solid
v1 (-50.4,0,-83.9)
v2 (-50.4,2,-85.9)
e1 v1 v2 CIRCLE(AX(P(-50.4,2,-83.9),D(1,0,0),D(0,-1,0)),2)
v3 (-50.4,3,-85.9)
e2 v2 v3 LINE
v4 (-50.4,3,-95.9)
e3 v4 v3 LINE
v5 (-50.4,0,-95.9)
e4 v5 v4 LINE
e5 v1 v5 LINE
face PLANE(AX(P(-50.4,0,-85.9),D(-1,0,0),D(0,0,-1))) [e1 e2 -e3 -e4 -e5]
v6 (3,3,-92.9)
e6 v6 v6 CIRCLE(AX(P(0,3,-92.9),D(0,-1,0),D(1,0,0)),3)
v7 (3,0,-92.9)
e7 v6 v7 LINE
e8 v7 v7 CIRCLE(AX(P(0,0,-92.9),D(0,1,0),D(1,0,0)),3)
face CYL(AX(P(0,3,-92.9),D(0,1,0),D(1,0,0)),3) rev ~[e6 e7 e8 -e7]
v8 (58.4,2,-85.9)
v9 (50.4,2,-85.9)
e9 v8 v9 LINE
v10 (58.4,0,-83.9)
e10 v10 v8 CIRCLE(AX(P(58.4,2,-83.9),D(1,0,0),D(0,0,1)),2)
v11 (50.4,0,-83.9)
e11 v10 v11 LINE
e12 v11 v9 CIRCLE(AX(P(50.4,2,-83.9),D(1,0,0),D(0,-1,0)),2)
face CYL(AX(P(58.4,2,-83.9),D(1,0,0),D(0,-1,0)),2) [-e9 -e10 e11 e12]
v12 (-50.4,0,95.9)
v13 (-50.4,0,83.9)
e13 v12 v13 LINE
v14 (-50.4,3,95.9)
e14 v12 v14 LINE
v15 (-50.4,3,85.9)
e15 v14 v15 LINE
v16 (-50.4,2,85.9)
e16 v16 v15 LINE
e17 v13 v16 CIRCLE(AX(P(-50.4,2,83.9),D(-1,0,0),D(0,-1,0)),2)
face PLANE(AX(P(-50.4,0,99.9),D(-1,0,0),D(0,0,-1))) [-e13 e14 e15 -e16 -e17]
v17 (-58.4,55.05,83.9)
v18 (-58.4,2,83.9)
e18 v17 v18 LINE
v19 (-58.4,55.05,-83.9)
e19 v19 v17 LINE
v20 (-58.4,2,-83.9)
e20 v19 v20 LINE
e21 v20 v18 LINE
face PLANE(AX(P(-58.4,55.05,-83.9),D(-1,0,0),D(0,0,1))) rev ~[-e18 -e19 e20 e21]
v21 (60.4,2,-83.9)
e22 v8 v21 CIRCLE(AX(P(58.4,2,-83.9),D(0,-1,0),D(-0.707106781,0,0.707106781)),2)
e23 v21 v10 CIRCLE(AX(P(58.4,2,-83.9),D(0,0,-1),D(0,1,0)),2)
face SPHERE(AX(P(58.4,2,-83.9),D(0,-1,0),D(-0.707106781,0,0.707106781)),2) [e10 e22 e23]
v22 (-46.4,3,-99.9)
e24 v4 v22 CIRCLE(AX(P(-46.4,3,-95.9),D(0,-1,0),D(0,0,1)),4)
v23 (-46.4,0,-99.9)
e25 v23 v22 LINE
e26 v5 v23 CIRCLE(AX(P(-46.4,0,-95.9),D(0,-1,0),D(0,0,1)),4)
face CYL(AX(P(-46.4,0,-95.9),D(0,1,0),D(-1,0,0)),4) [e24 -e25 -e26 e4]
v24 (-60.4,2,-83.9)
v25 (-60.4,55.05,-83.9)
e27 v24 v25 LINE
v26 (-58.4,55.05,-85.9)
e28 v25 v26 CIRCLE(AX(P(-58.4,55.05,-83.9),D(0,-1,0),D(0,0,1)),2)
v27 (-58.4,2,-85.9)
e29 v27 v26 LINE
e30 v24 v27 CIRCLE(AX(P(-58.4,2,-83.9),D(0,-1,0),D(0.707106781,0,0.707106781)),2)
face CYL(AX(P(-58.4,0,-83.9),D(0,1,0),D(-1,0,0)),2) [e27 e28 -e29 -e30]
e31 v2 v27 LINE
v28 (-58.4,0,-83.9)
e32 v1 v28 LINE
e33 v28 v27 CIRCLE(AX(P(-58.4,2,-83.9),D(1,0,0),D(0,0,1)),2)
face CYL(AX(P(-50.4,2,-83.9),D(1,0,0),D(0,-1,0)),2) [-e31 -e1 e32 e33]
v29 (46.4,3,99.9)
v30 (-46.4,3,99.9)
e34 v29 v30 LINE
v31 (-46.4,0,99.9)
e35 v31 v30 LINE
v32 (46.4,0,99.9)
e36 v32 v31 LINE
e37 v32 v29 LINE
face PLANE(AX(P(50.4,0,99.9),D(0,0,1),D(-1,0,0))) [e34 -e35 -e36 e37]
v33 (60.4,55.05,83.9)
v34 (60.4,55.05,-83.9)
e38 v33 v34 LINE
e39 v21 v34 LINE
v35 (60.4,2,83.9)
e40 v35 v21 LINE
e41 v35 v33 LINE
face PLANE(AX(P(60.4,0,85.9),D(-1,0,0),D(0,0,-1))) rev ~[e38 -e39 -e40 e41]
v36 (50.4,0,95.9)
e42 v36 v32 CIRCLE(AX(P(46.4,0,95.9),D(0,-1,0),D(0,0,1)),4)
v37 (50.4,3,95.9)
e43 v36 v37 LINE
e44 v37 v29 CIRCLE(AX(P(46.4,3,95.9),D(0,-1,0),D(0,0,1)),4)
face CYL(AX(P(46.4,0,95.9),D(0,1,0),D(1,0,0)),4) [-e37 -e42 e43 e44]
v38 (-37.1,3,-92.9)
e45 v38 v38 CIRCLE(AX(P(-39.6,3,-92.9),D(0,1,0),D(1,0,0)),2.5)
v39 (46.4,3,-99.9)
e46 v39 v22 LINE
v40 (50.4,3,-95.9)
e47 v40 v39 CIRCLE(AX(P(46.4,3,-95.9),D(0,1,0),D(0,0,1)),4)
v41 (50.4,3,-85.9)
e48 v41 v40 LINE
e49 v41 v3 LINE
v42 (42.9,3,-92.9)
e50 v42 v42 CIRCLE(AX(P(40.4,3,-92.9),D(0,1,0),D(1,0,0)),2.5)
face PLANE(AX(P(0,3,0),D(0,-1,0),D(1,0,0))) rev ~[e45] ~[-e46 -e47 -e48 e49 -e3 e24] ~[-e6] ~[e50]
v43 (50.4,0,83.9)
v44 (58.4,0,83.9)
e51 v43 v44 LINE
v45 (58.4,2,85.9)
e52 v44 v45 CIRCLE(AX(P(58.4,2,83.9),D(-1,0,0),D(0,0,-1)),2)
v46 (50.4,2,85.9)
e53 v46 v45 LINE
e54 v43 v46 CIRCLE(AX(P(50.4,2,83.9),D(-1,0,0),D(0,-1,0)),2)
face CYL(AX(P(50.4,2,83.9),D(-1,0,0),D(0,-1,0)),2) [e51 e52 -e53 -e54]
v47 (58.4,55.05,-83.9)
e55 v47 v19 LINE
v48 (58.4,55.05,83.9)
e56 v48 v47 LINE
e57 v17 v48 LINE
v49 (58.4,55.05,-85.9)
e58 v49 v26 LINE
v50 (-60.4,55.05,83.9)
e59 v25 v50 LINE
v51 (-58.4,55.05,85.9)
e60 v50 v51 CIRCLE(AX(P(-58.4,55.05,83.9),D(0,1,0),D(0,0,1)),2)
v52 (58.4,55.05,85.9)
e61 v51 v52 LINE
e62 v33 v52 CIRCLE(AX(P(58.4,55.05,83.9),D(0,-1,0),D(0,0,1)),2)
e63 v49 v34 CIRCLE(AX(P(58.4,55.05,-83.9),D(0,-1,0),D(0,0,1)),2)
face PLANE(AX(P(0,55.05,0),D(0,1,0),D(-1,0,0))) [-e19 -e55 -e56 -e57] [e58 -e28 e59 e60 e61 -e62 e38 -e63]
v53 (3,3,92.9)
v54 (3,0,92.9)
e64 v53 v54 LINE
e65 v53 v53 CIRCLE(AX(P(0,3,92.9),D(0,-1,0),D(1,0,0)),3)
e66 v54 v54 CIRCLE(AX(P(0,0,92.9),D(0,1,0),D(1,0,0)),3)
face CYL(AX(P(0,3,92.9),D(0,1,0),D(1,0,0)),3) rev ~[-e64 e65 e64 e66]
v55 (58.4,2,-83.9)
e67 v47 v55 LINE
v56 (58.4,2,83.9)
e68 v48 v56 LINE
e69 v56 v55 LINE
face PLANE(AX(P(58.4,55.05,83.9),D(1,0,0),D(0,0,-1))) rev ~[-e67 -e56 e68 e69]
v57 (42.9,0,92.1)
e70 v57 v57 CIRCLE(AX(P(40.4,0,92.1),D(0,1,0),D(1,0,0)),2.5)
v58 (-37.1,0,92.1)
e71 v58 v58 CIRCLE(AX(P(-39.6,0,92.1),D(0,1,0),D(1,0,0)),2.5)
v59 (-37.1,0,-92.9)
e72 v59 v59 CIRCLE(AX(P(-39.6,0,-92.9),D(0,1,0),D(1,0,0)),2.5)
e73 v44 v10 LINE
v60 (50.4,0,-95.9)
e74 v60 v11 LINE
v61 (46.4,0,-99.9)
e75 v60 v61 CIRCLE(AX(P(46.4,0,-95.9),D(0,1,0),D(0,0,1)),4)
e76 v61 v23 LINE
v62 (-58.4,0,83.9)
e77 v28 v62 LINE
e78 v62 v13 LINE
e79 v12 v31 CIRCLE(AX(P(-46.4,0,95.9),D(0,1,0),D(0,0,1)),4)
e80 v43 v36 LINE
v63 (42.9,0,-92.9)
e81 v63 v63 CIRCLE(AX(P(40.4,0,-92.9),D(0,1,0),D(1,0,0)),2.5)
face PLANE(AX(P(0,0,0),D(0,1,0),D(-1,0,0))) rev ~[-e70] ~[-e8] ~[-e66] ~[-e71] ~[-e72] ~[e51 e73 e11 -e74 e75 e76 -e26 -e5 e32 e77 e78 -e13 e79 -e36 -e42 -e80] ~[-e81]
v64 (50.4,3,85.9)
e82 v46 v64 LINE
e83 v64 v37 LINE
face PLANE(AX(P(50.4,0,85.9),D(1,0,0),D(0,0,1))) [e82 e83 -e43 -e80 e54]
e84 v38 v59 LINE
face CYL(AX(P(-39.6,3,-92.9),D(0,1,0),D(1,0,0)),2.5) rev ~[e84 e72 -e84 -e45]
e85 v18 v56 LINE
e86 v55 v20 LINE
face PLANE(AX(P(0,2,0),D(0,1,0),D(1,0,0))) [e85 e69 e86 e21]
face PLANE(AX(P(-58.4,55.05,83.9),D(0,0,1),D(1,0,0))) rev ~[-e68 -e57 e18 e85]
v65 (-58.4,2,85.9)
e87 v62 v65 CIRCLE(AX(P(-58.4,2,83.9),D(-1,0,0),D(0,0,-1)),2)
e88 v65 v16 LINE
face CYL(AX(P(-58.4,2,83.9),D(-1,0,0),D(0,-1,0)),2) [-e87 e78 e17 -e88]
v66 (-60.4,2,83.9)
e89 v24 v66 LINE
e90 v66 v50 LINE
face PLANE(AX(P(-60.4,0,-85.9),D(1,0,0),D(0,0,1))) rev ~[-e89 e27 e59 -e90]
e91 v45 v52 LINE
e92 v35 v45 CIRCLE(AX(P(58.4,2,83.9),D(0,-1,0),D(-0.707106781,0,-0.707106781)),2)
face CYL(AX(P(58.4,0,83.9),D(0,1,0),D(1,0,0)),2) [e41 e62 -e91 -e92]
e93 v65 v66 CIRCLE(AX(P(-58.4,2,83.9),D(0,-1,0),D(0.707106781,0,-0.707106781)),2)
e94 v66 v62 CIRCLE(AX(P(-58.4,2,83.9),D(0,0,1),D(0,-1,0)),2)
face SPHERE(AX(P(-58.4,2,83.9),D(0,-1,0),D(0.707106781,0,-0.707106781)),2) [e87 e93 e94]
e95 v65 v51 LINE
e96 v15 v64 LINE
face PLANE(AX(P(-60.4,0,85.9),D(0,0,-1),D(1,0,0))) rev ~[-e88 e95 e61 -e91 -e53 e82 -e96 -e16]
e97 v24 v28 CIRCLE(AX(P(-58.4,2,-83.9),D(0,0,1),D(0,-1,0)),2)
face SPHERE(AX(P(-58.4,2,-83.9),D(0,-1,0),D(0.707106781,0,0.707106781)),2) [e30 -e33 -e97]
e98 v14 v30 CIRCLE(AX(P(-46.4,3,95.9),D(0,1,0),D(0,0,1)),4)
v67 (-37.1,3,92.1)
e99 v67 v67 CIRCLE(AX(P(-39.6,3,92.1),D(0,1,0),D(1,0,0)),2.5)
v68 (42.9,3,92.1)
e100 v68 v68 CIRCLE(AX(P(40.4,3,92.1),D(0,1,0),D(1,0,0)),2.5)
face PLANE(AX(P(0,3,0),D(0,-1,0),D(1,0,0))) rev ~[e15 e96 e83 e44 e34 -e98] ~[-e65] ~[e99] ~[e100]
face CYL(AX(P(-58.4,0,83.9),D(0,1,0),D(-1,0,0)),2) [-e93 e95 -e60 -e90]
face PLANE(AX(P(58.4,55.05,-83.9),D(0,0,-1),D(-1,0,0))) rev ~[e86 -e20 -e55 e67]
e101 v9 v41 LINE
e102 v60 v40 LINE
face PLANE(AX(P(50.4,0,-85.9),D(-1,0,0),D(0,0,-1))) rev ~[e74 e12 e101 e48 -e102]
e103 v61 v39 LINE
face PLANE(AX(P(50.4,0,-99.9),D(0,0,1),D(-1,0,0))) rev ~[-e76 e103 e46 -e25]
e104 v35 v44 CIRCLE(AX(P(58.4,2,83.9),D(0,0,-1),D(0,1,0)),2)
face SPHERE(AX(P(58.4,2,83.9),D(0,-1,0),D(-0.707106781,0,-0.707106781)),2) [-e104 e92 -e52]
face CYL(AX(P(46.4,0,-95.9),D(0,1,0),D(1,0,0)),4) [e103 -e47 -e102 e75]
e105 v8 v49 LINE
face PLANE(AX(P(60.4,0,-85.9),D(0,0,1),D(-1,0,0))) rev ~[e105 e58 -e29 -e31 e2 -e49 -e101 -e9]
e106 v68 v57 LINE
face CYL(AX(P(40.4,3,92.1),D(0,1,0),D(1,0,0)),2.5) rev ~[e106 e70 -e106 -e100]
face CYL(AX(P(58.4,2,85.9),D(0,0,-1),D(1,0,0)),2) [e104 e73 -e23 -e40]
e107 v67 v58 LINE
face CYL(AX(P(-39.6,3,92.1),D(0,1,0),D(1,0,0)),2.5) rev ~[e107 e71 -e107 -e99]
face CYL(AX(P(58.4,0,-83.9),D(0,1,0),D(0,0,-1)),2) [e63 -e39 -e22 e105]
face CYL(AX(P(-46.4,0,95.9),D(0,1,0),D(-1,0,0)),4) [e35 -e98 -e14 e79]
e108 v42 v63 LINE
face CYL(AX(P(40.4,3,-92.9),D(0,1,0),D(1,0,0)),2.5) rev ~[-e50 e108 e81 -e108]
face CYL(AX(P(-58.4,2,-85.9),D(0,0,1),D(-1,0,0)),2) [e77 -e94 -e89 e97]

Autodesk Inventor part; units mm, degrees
ref_plane "XZ Plane" through (0, 0, 0) normal (0, 1, 0) x (-1, 0, 0)
sketch "Sketch1" plane through (0, 0, 0) normal (0, 1, 0) x (-1, 0, 0)
  line L0 (60.4, 85.9) -> (-60.4, 85.9)
  line L1 (-60.4, 85.9) -> (-60.4, -85.9)
  line L2 (-60.4, -85.9) -> (60.4, -85.9)
  line L3 (60.4, -85.9) -> (60.4, 85.9)
  point P0 (0, 0)
  dimension "d0" = 85.9
  dimension "d1" = 85.9
  dimension "d2" = 60.4
  dimension "d3" = 60.4
extrude "Extrusion1" add sketch "Sketch1" along normal blind 55.05
fillet "Fillet1" radius 2 6 edges at (60.4, 27.525, 85.9) (-60.4, 27.525, 85.9) (60.4, 27.525, -85.9) (-60.4, 27.525, -85.9) (60.4, 0, 0) (-60.4, 0, 0)
sketch "Sketch2" plane through (0, 55.05, 0) normal (0, 1, 0) x (1, 0, 0)
  line L0 (-58.4, -83.9) -> (58.4, -83.9)
  line L1 (58.4, -83.9) -> (58.4, 83.9)
  line L2 (58.4, 83.9) -> (-58.4, 83.9)
  line L3 (-58.4, 83.9) -> (-58.4, -83.9)
  line L4 (-60.4, 83.9) -> (-60.4, -83.9) projected
  line L5 (-58.4, -85.9) -> (58.4, -85.9) projected
  line L6 (60.4, -83.9) -> (60.4, 83.9) projected
  line L7 (58.4, 85.9) -> (-58.4, 85.9) projected
  point P0 (0, 0)
  dimension "d7" = 2
  dimension "d8" = 2
  dimension "d9" = 2
  dimension "d10" = 2
extrude "Extrusion2" cut sketch "Sketch2" against normal blind 53.05
sketch "Sketch3" plane through (0, 0, 0) normal (0, -1, 0) x (1, 0, 0)
  line L0 (-58.4, -85.9) -> (-58.4, 85.9) projected
  line L1 (58.4, -85.9) -> (-58.4, -85.9) projected
  line L2 (58.4, 85.9) -> (58.4, -85.9) projected
  line L3 (-58.4, 85.9) -> (58.4, 85.9) projected
  line L4 (-58.4, 85.9) -> (58.4, 85.9) projected
  line L5 (50.4, 85.9) -> (50.4, 99.9)
  line L6 (50.4, 99.9) -> (-50.4, 99.9)
  line L7 (-50.4, 99.9) -> (-50.4, 85.9)
  line L8 (-60.4, 83.9) -> (-60.4, -83.9) projected
  line L9 (60.4, -83.9) -> (60.4, 83.9) projected
  line L10 (-134.6994, 0) -> (135.5184, 0) construction
  line L11 (50.4, -85.9) -> (50.4, -99.9)
  line L12 (50.4, -99.9) -> (-50.4, -99.9)
  line L13 (-50.4, -99.9) -> (-50.4, -85.9)
  line L14 (50.4, 85.9) -> (-50.4, 85.9)
  line L15 (-50.4, -85.9) -> (50.4, -85.9)
  point P0 (0, 0)
  dimension "d13" = 10
  dimension "d14" = 10
  dimension "d15" = 14
  dimension "d16" = 0
extrude "Extrusion3" add sketch "Sketch3" against normal blind 3 contours L1 L11 L12 L13 | L7 L6 L5 L3
fillet "Fillet2" radius 4 4 edges at (-50.4, 1.5, -99.9) (50.4, 1.5, -99.9) (50.4, 1.5, 99.9) (-50.4, 1.5, 99.9)
fillet "Fillet3" radius 2 8 edges at (-59.8142, 0.5858, 85.3142) (-54.4, 0, 85.9) (59.8142, 0.5858, 85.3142) (54.4, 0, 85.9) (59.8142, 0.5858, -85.3142) (54.4, 0, -85.9) (-59.8142, 0.5858, -85.3142) (-54.4, 0, -85.9)
sketch "Sketch4" plane through (0, 2, 0) normal (0, 1, 0) x (1, 0, 0)
  circle A0 centre (-54.9, 80.4) radius 1.25
  line L0 (58.4, 85.9) -> (-58.4, 85.9) projected
  line L1 (-60.4, 83.9) -> (-60.4, -83.9) projected
  circle A1 centre (54.1, 80.4) radius 1.25
  circle A2 centre (-54.9, -79.6) radius 1.25
  circle A3 centre (54.1, -79.6) radius 1.25
  circle A4 centre (-54.9, 80.4) radius 2.25
  circle A5 centre (-54.9, -79.6) radius 2.25
  circle A6 centre (54.1, 80.4) radius 2.25
  circle A7 centre (54.1, -79.6) radius 2.25
  line L2 (-58.4, 83.9) -> (-60.4, 83.9) projected
  line L3 (-58.4, 83.9) -> (-58.4, 75.9)
  line L4 (-58.4, 83.9) -> (-58.4, -83.9) projected
  line L5 (-58.4, 85.9) -> (-58.4, 83.9) projected
  line L6 (-58.4, 83.9) -> (-50.4, 83.9)
  line L7 (-58.4, 83.9) -> (58.4, 83.9) projected
  arc A8 (-55.4407, 78.2159) -> (-58.4, 75.9) centre (-56.0141, 75.9) ccw
  arc A9 (-50.4, 83.9) -> (-52.7159, 80.9407) centre (-50.4, 81.5141) ccw
  line L8 (58.4, 83.9) -> (58.4, -83.9) projected
  line L9 (58.4, 83.9) -> (48.8739, 83.9)
  line L10 (58.4, 83.9) -> (58.4, 75.9)
  line L11 (58.4, -83.9) -> (58.4, 83.9) projected
  line L12 (58.4, -83.9) -> (-58.4, -83.9) projected
  line L13 (-58.4, -83.9) -> (-58.4, -75.9)
  line L14 (-58.4, -83.9) -> (-58.4, 83.9) projected
  line L15 (-58.4, -83.9) -> (-50.4, -83.9)
  arc A10 (-52.7997, -80.4071) -> (-50.4, -83.9) centre (-50.4, -81.3292) ccw
  arc A11 (-58.4, -75.9) -> (-55.8323, -77.5522) centre (-56.5846, -75.9) ccw
  line L16 (58.4, -83.9) -> (50.4, -83.9)
  line L17 (58.4, -83.9) -> (58.4, -75.9)
  arc A12 (55.2614, -77.6729) -> (58.4, -75.9) centre (56.33, -75.9) ccw
  arc A13 (50.4, -83.9) -> (52.1729, -80.7614) centre (50.4, -81.83) ccw
  circle A14 centre (54.5, 0) radius 1.25
  circle A15 centre (-54.5, 0) radius 1.25
  circle A16 centre (-54.5, 0) radius 2.25
  circle A17 centre (54.5, 0) radius 2.25
  line L18 (54.5, -2.25) -> (56.9, -2.25)
  line L19 (54.5, 2.25) -> (56.9, 2.25)
  line L20 (-54.5, -2.25) -> (-56.9, -2.25)
  line L21 (-54.5, 2.25) -> (-56.9, 2.25)
  line L22 (0, 85.9) -> (0, 75.9)
  line L23 (-58.4, -83.9) -> (-58.4, 83.9) projected
  line L24 (58.4, -83.9) -> (-58.4, -83.9) projected
  line L25 (-58.4, 83.9) -> (58.4, 83.9) projected
  arc A18 (58.4, -3.75) -> (56.9, -2.25) centre (56.9, -3.75) ccw
  line L26 (58.4, 83.9) -> (58.4, -83.9) projected
  arc A19 (56.9, 2.25) -> (58.4, 3.75) centre (56.9, 3.75) ccw
  arc A20 (-56.9, -2.25) -> (-58.4, -3.75) centre (-56.9, -3.75) ccw
  arc A21 (-58.4, 3.75) -> (-56.9, 2.25) centre (-56.9, 3.75) ccw
  arc A22 (51.8602, 80.6143) -> (48.8739, 83.9) centre (48.8739, 80.9) ccw
  arc A23 (58.4, 75.3135) -> (54.6571, 78.2201) centre (55.4, 75.3135) ccw
  line L27 (-58.4, 75.9) -> (-58.4, 83.7116)
  line L28 (-58.4, 75.9) -> (-58.4, 83.9)
  line L29 (-50.4, 83.9) -> (-58.4, 83.9)
  line L30 (60.4, 83.9) -> (58.4, 83.9) projected
  line L31 (48.8739, 83.9) -> (58.4, 83.9)
  line L32 (58.4, 83.9) -> (58.4, 75.3135)
  point P0 (0, 0)
  point P1 (58.4, -2.25)
  point P2 (58.4, 2.25)
  point P3 (-58.4, -2.25)
  point P4 (-58.4, 2.25)
  dimension "d21" = 2.5
  dimension "d23" = 5.5
  dimension "d24" = 5.5
  dimension "d27" = 109
  dimension "d30" = 160
  dimension "d33" = 4.5
  dimension "d36" = 160
  dimension "d39" = 109
  dimension "d42" = 8
  dimension "d43" = 8
  dimension "d46" = 8
  dimension "d47" = 8
  dimension "d48" = 8
  dimension "d49" = 8
  dimension "d52" = 2.5
  dimension "d53" = 2.5
  dimension "d54" = 3.9
  dimension "d56" = 3.9
  dimension "d57" = 0
  dimension "d58" = 0
  dimension "d59" = 4.5
  dimension "d60" = 4.5
  dimension "d115" = 1.5
  dimension "d116" = 1.5
  dimension "d117" = 1.5
  dimension "d118" = 1.5
  dimension "d119" = 3
  dimension "d120" = 3
sketch "Sketch6" plane through (0, 3, 0) normal (0, 1, 0) x (1, 0, 0)
  circle A0 centre (40.4, 92.9) radius 2.5
  line L0 (50.4, 85.9) -> (50.4, 95.9) projected
  line L1 (46.4, 99.9) -> (-46.4, 99.9) projected
  circle A1 centre (-39.6, 92.9) radius 2.5
  circle A2 centre (40.4, -92.1) radius 2.5
  circle A3 centre (-39.6, -92.1) radius 2.5
  circle A4 centre (0, 92.9) radius 3
  circle A5 centre (0, -92.9) radius 3
  line L2 (-50.4, -85.9) -> (50.4, -85.9) projected
  line L3 (0, 139.86) -> (0, -139.86) projected
  line L4 (50.4, 85.9) -> (-50.4, 85.9) projected
  point P0 (0, 0)
  dimension "d62" = 5
  dimension "d63" = 10
  dimension "d64" = 7
  dimension "d67" = 80
  dimension "d70" = 185
  dimension "d109" = 6
  dimension "d110" = 6
  dimension "d111" = 7
  dimension "d112" = 0
  dimension "d113" = 7
  dimension "d114" = 0
extrude "Extrusion5" cut sketch "Sketch6" against normal blind 3
sketch "Sketch8" plane through (0, 55.05, 0) normal (0, 1, 0) x (1, 0, 0)
  line L0 (58.4, 83.9) -> (58.4, -83.9) projected
  line L1 (58.4, -83.9) -> (-58.4, -83.9) projected
  line L2 (-58.4, -83.9) -> (-58.4, 83.9) projected
  line L3 (-58.4, 83.9) -> (58.4, 83.9) projected
  arc A0 (-60.4, -83.9) -> (-58.4, -85.9) centre (-58.4, -83.9) ccw projected
  line L4 (-58.4, -85.9) -> (58.4, -85.9) projected
  arc A1 (58.4, -85.9) -> (60.4, -83.9) centre (58.4, -83.9) ccw projected
  line L5 (60.4, -83.9) -> (60.4, 83.9) projected
  arc A2 (60.4, 83.9) -> (58.4, 85.9) centre (58.4, 83.9) ccw projected
  line L6 (58.4, 85.9) -> (-58.4, 85.9) projected
  arc A3 (-58.4, 85.9) -> (-60.4, 83.9) centre (-58.4, 83.9) ccw projected
  line L7 (-60.4, 83.9) -> (-60.4, -83.9) projected
  point P0 (0, 0)
equation "\"d1\" = d0"
equation "\"d3\" = d2"
equation "\"d7\" = d8"
equation "\"d9\" = d8"
equation "\"d10\" = d8"
properties part number "Main Enclosure Base 2"
